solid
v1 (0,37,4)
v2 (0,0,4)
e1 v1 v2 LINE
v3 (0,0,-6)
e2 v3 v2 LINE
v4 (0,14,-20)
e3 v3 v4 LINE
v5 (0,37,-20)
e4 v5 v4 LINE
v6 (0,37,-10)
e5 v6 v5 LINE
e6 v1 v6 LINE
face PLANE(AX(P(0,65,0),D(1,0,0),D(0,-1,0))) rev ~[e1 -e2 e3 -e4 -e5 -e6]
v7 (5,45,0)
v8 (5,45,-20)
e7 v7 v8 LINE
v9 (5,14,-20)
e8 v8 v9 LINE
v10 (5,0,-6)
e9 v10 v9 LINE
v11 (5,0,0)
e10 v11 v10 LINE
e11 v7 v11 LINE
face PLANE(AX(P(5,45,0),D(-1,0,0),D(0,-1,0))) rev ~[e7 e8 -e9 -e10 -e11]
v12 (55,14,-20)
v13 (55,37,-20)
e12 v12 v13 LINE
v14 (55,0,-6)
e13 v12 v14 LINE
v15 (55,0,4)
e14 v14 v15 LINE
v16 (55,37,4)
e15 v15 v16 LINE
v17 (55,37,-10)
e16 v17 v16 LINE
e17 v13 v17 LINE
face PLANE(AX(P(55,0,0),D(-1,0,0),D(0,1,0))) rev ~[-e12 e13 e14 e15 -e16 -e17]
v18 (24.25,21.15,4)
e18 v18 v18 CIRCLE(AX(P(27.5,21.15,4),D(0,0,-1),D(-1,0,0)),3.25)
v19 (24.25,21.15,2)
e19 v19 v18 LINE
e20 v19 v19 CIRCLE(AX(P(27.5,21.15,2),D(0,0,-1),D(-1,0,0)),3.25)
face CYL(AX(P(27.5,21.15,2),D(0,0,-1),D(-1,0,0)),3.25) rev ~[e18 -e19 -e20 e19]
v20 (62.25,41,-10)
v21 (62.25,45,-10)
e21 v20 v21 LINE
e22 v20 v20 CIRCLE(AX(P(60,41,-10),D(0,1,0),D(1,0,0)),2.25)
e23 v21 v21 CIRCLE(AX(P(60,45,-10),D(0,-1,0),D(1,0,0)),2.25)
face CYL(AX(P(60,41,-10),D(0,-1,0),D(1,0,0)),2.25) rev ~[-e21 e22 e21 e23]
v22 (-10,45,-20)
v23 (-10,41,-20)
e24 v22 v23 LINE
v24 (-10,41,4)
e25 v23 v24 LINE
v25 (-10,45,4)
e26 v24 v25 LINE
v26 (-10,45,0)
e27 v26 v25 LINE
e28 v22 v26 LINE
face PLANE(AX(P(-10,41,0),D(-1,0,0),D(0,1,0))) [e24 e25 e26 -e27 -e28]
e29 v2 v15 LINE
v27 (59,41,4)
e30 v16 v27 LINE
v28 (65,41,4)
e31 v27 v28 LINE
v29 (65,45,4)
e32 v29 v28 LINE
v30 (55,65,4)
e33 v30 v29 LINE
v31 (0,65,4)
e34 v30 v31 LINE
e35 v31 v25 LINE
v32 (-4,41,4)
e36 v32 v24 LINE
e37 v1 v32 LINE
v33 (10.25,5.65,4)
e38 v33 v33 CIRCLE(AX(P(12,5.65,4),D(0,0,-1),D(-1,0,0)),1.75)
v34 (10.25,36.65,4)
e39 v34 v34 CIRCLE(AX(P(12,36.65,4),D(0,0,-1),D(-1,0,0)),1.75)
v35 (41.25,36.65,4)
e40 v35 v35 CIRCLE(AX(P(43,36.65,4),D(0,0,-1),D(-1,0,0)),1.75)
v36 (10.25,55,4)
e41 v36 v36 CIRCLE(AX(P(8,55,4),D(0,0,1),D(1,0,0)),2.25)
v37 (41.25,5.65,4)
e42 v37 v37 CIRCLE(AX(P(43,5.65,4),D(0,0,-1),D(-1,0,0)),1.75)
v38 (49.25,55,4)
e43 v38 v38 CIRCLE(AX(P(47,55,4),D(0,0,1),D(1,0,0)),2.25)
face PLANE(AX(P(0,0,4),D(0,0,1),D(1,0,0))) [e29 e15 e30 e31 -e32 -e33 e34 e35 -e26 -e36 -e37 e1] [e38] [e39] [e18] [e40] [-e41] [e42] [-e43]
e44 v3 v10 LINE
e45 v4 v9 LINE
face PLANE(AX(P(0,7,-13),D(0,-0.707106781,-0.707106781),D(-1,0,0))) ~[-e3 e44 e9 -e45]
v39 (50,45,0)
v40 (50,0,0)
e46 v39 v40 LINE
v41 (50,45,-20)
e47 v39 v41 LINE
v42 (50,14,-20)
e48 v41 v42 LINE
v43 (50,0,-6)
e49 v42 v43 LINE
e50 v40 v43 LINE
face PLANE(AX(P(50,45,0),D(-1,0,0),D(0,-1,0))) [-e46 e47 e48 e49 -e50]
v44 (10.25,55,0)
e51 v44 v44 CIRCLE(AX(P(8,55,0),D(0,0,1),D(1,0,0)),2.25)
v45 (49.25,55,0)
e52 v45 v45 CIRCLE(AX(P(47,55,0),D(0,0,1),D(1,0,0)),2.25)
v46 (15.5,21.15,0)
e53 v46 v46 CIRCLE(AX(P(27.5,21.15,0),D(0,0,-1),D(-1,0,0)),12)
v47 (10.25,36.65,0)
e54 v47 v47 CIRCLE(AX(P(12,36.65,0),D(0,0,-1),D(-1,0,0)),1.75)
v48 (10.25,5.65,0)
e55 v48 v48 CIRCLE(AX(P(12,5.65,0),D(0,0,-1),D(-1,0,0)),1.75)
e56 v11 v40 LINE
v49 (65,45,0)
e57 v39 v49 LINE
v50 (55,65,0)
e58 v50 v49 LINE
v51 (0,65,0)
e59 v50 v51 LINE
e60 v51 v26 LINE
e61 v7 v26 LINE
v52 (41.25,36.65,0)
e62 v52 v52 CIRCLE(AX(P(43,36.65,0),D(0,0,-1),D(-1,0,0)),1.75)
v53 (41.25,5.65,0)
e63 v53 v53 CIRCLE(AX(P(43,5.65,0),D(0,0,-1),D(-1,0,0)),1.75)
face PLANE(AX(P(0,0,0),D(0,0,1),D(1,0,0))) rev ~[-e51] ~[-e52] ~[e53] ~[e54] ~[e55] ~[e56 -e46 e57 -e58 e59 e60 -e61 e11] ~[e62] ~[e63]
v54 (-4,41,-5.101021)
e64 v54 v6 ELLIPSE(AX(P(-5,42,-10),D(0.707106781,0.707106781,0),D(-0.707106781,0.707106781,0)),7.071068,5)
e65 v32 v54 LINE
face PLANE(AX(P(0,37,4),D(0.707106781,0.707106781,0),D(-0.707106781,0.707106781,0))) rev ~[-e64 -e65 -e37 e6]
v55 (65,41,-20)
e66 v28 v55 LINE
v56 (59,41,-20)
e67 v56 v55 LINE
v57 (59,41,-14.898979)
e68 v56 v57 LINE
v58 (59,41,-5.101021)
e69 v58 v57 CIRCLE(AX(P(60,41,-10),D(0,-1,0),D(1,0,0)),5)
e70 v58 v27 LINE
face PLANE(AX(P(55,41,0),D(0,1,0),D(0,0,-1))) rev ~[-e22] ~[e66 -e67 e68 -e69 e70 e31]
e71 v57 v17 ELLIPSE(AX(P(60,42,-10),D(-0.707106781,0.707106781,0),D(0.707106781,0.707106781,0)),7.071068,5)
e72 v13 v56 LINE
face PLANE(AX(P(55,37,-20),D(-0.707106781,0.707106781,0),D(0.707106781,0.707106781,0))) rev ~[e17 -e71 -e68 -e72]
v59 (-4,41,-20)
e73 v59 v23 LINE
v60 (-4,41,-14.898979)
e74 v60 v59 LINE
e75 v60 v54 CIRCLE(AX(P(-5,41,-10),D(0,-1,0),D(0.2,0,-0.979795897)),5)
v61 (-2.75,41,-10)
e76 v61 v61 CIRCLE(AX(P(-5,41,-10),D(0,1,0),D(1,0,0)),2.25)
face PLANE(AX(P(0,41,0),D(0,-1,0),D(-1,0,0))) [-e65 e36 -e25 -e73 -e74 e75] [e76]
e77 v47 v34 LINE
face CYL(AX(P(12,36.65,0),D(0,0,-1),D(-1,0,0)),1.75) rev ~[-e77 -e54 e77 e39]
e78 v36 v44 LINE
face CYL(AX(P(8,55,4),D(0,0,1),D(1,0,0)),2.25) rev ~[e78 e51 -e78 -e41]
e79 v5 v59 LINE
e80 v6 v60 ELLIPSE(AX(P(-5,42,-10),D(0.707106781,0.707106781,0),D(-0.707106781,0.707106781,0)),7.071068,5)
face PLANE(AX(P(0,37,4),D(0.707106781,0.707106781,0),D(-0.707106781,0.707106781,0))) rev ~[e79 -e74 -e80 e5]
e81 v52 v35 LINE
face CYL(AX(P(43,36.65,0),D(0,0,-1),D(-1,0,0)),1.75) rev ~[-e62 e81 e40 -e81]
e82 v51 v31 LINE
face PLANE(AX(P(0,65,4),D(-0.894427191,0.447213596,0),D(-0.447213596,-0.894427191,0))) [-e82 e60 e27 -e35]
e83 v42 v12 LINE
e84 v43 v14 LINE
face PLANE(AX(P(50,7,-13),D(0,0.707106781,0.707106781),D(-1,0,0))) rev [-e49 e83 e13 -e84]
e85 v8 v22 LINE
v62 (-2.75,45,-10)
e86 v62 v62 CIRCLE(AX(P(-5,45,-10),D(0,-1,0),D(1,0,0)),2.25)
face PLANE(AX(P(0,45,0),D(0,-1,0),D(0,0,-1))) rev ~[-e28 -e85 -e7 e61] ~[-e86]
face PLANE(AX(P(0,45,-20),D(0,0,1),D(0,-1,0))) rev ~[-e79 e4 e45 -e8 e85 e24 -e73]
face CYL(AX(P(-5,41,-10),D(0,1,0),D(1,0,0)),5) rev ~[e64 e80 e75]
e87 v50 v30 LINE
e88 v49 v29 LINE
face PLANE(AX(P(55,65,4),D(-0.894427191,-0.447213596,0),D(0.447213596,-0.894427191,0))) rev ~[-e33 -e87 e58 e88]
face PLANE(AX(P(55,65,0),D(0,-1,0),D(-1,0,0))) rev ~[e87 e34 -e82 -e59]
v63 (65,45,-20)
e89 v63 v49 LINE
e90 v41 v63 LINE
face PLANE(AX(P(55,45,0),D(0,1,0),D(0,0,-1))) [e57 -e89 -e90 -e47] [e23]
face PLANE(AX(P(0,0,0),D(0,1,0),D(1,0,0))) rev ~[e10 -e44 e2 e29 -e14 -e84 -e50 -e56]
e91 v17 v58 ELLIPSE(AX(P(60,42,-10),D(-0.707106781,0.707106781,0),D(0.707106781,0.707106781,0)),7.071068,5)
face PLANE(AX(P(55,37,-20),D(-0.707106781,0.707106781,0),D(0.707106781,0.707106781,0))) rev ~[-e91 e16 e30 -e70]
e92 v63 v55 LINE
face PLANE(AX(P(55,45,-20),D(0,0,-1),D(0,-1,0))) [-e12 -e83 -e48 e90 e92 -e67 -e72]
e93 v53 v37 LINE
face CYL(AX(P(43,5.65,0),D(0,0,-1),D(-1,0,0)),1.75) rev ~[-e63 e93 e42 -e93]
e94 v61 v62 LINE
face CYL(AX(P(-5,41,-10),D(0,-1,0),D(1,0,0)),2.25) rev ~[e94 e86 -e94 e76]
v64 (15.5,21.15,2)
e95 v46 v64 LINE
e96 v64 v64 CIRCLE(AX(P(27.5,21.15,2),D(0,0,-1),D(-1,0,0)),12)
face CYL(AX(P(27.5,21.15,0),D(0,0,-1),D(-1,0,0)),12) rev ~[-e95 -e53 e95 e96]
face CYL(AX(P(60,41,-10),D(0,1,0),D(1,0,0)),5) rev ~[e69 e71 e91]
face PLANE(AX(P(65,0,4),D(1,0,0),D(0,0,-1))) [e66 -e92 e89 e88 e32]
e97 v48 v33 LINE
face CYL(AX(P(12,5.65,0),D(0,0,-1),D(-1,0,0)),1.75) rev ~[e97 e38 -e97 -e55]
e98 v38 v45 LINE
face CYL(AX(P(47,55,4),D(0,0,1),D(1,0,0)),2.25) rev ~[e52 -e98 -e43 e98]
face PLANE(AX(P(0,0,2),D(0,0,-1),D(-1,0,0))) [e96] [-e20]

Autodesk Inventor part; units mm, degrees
ref_plane "YZ Plane" through (0, 0, 0) normal (1, 0, 0) x (0, 1, 0)
ref_plane "XZ Plane" through (0, 0, 0) normal (0, 1, 0) x (-1, 0, 0)
ref_plane "XY Plane" through (0, 0, 0) normal (0, 0, 1) x (1, 0, 0)
sketch "Sketch1" plane through (0, 0, 0) normal (0, 0, 1) x (1, 0, 0)
  line L0 (0, 0) -> (55, 0)
  line L1 (55, 0) -> (55, 65)
  line L2 (55, 65) -> (0, 65)
  line L3 (0, 65) -> (0, 0)
  dimension "d0" = 55
  dimension "d1" = 65
extrude "Extrusion1" add sketch "Sketch1" along normal blind 4
sketch "Sketch2" plane through (0, 0, 0) normal (0, 0, -1) x (-1, 0, 0)
  line L0 (0, 0) -> (-55, 0) projected
  line L1 (-55, 65) -> (0, 65) projected
  line L2 (-55, 0) -> (-55, 65) projected
  line L3 (0, 65) -> (0, 0) projected
  line L4 (0, 45) -> (-5, 45)
  line L5 (-5, 45) -> (-5, 0)
  line L6 (-55, 45) -> (-50, 45)
  line L7 (-50, 45) -> (-50, 0)
  dimension "d4" = 5
  dimension "d5" = 20
extrude "Extrusion2" add sketch "Sketch2" along normal blind 20 contours L0 L5 L4 L3 | L0 L2 L6 L7
sketch "Sketch3" plane through (0, 0, 4) normal (-1, 0, 0) x (0, 0, 1)
  line L0 (-4, 65) -> (-4, 45) projected
  line L1 (-4, 45) -> (-24, 45) projected
  line L2 (-4, 45) -> (-4, 41)
  line L3 (-4, 41) -> (-24, 41)
  line L4 (-24, 45) -> (-24, 0) projected
  point P0 (-4, 0)
  dimension "d8" = 4
extrude "Extrusion3" add sketch "Sketch3" along normal blind 10
sketch "Sketch4" plane through (55, 0, 4) normal (1, 0, 0) x (0, 0, -1)
  line L0 (24, 45) -> (24, 0) projected
  line L1 (4, 45) -> (24, 45) projected
  line L2 (4, 41) -> (24, 41) projected
  line L3 (4, 41) -> (4, 45) projected
  point P0 (4, 0)
extrude "Extrusion4" add sketch "Sketch4" along normal blind 10
sketch "Sketch5" plane through (0, 0, 0) normal (0, 0, -1) x (-1, 0, 0)
  line L0 (-5, 0) -> (-50, 0) projected
  line L1 (-5, 0) -> (-5, 45) projected
  circle A0 centre (-12, 5.65) radius 1.75
  circle A1 centre (-12, 36.65) radius 1.75
  circle A2 centre (-43, 5.65) radius 1.75
  circle A3 centre (-43, 36.65) radius 1.75
  point P0 (0, 0)
  dimension "d13" = 3.5
  dimension "d14" = 31
  dimension "d15" = 31
  dimension "d16" = 7
  dimension "d17" = 5.65
extrude "Extrusion5" cut sketch "Sketch5" against normal up to next
chamfer "Chamfer1" distance 14 angle 45 2 edges at (2.5, 0, -20) (52.5, 0, -20)
sketch "Sketch6" plane through (0, 0, 4) normal (0, 0, 1) x (1, 0, 0)
  line L0 (55, 0) -> (55, 65) projected
  line L1 (55, 65) -> (0, 65) projected
  line L2 (0, 65) -> (0, 0) projected
  circle A0 centre (8, 55) radius 2.25
  circle A1 centre (47, 55) radius 2.25
  dimension "d23" = 4.5
  dimension "d24" = 10
  dimension "d25" = 8
  dimension "d26" = 8
extrude "Extrusion6" cut sketch "Sketch6" against normal up to next
sketch "Sketch7" plane through (0, 41, -20) normal (0, -1, 0) x (1, 0, 0)
  line L0 (0, 20) -> (-10, 20) projected
  line L1 (-10, 0) -> (-10, 20) projected
  line L2 (55, 0) -> (55, 20) projected
  line L3 (55, 0) -> (65, 0) projected
  line L4 (65, 20) -> (65, 0) projected
  line L5 (55, 20) -> (65, 20) projected
  circle A0 centre (-5, 10) radius 2.25
  circle A1 centre (60, 10) radius 2.25
  dimension "d29" = 4.5
  dimension "d30" = 5
  dimension "d31" = 10
  dimension "d32" = 5
extrude "Extrusion7" cut sketch "Sketch7" against normal up to next contours A0 | A1
sketch "Sketch8" plane through (0, 41, 0) normal (0, 0, 1) x (1, 0, 0)
  line L0 (0, 4) -> (0, 0) projected
  line L1 (0, 4) -> (-10, 4) projected
  line L2 (-10, 0) -> (-10, 4) projected
  line L3 (0, 0) -> (-10, 0) projected
  line L4 (55, 0) -> (55, 4) projected
  line L5 (55, 0) -> (65, 0) projected
  line L6 (65, 4) -> (65, 0) projected
  line L7 (55, 4) -> (65, 4) projected
  point P0 (0, -41)
extrude "Extrusion8" add sketch "Sketch8" along normal up to surface (4 mm away)
sketch "Sketch9" plane through (0, 0, 4) normal (0, 0, 1) x (1, 0, 0)
  line L0 (55, 45) -> (65, 45) projected
  line L1 (55, 45) -> (55, 65) projected
  line L2 (0, 65) -> (0, 45) projected
  line L3 (-10, 45) -> (0, 45) projected
  line L4 (55, 65) -> (65, 45)
  line L5 (0, 65) -> (-10, 45)
extrude "Extrusion9" add sketch "Sketch9" against normal blind 4
sketch "Sketch10" plane through (0, 0, 0) normal (0, 0, -1) x (-1, 0, 0)
  circle A0 centre (-43, 5.65) radius 1.75 projected
  circle A1 centre (-27.5, 21.15) radius 12
  point P0 (0, 0)
  dimension "d39" = 24
  dimension "d40" = 15.5
  dimension "d41" = 15.5
extrude "Extrusion10" cut sketch "Sketch10" against normal blind 2 contours A1
sketch "Sketch11" plane through (27.5, 21.15, 2) normal (0, 0, -1) x (-1, 0, 0)
  circle A0 centre (0, 0) radius 12 projected
  circle A1 centre (0, 0) radius 3.25
  point P0 (27.5, -21.15)
  dimension "d44" = 6.5
extrude "Extrusion11" cut sketch "Sketch11" against normal up to next contours A1
chamfer "Chamfer2" distance 4 angle 45 2 edges at (0, 41, -8) (55, 41, -8)
sketch "Sketch12" plane through (-10, 41, -20) normal (0, -1, 0) x (1, 0, 0)
  arc A0 (6, 12.0156) -> (6, 7.9844) centre (5, 10) ccw projected
  line L0 (69, 12.0156) -> (69, 24) projected
  arc A1 (69, 7.9844) -> (69, 12.0156) centre (70, 10) ccw projected
  line L1 (69, 0) -> (69, 7.9844) projected
  line L2 (69, 0) -> (75, 0) projected
  line L3 (75, 0) -> (75, 24) projected
  line L4 (75, 24) -> (69, 24) projected
  circle A2 centre (5, 10) radius 5
  circle A3 centre (70, 10) radius 5
  point P0 (10, 20)
  dimension "d50" = 10
  dimension "d51" = 10
extrude "Extrusion12" cut sketch "Sketch12" along normal blind 7.5 contours A1 L1 A3 L0 | L0 A3 L1 A1 | A2
properties part number "ZMotorMount" material "ABS Plastic"
